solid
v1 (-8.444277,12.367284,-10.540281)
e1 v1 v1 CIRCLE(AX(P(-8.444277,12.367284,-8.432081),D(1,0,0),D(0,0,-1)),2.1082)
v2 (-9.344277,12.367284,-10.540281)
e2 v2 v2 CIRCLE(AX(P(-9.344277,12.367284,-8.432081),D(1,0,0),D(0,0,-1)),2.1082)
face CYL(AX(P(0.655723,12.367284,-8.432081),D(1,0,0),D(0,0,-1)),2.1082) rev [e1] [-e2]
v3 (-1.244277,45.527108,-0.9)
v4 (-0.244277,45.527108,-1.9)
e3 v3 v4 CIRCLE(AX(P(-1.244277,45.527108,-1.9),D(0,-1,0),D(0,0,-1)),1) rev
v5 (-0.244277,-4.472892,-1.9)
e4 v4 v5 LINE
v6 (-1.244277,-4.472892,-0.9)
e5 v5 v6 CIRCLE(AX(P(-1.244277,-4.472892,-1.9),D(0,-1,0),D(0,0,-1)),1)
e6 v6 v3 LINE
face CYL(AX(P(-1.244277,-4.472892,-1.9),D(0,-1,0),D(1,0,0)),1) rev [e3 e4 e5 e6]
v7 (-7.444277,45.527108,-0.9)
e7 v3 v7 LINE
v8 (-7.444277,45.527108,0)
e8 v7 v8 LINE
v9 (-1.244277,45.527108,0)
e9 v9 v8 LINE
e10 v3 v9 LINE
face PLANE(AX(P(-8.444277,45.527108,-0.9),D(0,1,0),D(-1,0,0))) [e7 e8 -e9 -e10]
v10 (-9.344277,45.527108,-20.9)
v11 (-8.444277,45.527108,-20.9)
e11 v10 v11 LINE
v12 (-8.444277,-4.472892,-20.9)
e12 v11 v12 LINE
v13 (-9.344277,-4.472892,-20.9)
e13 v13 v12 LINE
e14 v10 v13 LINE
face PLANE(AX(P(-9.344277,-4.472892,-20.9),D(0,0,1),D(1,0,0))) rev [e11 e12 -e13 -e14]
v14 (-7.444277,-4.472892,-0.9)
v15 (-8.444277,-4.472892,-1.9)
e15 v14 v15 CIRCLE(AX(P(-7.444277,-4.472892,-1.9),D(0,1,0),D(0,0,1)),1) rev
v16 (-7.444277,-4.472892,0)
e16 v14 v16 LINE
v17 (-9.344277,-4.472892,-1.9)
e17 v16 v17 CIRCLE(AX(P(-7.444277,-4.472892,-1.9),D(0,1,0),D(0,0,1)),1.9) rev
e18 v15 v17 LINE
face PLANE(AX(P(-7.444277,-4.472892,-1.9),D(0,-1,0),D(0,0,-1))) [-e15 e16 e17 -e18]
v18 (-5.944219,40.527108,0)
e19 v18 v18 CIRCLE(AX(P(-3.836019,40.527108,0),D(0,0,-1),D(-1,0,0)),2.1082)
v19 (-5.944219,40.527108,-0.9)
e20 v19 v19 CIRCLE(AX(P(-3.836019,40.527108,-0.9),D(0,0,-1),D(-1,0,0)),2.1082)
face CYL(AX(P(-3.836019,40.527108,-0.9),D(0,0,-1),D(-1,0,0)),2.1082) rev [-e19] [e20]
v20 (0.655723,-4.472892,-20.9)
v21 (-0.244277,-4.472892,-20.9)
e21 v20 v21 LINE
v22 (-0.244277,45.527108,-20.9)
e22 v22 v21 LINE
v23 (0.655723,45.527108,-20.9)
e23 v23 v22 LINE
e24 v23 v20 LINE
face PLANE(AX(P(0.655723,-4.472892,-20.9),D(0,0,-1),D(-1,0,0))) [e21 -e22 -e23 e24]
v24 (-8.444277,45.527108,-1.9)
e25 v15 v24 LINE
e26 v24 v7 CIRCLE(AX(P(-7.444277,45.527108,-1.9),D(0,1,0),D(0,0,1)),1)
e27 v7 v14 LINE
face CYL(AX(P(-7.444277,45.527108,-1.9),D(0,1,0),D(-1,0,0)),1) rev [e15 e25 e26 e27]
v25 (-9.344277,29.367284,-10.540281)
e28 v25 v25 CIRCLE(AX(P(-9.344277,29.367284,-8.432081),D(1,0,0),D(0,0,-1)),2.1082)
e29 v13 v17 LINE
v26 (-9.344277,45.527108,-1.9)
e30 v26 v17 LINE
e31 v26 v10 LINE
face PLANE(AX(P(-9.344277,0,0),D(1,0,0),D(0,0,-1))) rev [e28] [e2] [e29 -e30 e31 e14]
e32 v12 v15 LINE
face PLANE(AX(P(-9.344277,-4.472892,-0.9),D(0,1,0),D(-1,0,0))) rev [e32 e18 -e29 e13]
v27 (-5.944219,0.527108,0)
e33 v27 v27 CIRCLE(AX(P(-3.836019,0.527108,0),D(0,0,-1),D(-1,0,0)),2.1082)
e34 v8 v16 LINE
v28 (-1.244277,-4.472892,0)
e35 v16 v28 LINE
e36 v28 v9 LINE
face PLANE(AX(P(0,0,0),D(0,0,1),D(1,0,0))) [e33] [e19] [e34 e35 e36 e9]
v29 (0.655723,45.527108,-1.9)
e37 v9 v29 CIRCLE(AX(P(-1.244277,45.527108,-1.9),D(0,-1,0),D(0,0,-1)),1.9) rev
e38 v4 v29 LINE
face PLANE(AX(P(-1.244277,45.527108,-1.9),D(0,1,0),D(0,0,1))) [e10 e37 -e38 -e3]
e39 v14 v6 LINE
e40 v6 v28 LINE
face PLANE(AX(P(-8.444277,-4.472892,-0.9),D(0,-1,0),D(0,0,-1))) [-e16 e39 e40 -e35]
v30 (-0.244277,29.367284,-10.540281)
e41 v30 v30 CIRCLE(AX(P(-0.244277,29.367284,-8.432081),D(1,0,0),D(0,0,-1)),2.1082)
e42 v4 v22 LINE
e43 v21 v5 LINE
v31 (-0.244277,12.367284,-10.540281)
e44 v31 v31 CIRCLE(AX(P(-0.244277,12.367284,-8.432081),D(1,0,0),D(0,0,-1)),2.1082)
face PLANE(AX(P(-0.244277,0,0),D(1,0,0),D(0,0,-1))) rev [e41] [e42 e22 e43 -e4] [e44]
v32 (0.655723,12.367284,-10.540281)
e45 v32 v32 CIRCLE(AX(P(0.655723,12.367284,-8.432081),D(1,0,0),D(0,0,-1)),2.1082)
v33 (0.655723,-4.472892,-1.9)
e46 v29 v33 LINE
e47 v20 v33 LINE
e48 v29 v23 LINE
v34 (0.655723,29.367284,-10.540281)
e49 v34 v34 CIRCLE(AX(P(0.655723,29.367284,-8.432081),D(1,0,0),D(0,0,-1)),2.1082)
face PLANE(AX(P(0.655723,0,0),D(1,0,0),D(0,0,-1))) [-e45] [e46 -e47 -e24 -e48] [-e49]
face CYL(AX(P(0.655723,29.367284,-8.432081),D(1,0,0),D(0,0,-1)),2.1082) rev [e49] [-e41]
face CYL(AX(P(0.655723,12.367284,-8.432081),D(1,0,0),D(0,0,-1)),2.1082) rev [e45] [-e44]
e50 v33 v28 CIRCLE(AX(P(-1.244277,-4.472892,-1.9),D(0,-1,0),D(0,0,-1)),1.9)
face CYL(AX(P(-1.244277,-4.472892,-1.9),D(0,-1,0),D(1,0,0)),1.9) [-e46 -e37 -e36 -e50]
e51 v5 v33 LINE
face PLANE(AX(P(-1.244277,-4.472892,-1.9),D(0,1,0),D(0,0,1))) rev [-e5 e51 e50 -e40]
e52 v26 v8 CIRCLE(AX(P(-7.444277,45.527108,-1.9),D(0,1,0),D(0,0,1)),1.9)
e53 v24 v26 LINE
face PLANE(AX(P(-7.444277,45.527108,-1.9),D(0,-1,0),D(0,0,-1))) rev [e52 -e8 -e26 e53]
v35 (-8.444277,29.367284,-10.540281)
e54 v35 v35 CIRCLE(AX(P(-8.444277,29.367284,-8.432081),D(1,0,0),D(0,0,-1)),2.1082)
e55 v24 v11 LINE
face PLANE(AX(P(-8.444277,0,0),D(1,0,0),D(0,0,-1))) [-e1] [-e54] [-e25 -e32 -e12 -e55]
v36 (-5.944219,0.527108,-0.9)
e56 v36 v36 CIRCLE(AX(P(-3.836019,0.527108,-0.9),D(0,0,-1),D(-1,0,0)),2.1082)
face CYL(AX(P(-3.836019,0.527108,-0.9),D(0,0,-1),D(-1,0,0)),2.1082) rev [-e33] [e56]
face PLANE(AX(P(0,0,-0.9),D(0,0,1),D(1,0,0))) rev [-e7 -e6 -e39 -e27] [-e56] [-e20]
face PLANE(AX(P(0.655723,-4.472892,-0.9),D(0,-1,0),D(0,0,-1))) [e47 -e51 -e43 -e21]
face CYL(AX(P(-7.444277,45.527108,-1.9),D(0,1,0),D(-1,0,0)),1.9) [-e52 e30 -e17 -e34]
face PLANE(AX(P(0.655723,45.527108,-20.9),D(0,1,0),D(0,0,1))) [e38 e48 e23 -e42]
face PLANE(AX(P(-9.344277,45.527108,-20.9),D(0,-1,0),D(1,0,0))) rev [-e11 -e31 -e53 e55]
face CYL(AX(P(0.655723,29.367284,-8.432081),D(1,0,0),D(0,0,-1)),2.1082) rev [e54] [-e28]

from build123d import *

# Parameters (mm, degrees)
SKETCH1_W                    = 8.2
SKETCH1_H                    = 50
BASE_FLANGE1_DEPTH           = 0.9
EDGE_FLANGE2_STRIP_W         = 5.6
EDGE_FLANGE2_STRIP_H         = 0.9
EDGE_FLANGE2_STRIP_CUT_DEPTH = 50
EDGE_FLANGE2_DEPTH           = 50
EDGE_FLANGE5_STRIP_W         = 5.6
EDGE_FLANGE5_STRIP_H         = 0.9
EDGE_FLANGE5_STRIP_CUT_DEPTH = 50
EDGE_FLANGE5_DEPTH           = 50
F_19_0_166_DIAMETER_SLOT1_D  = 4.2164
F_19_0_166_DIAMETER_SLOT2_D  = 4.2164


# Sheet-metal steps are written as plain solids
with BuildPart() as part:
    # Sketch1 → Base-Flange1 (new body)
    with BuildSketch(Plane.XY):
        with Locations((-4.344277108, 20.527108434)):
            Rectangle(SKETCH1_W, SKETCH1_H)
    extrude(amount=-BASE_FLANGE1_DEPTH)

    # Edge-Flange2 strip (across the edge) → Edge-Flange2 strip cut (cut)
    with BuildSketch(Plane(origin=(-8.444277108, -4.472891566, -0.9), x_dir=(1, 0, 0), z_dir=(0, 1, 0))):
        with Locations((-1.8, -0.45)):
            Rectangle(EDGE_FLANGE2_STRIP_W, EDGE_FLANGE2_STRIP_H)
    extrude(amount=EDGE_FLANGE2_STRIP_CUT_DEPTH, mode=Mode.SUBTRACT)

    # Edge-Flange2 section (across the edge) → Edge-Flange2 (add)
    with BuildSketch(Plane(origin=(-8.444277108, -4.472891566, -0.9), x_dir=(1, 0, 0), z_dir=(0, 1, 0))):
        with BuildLine():
            Line((-0.9, 1), (-0.9, 20))
            Line((-0.9, 20), (0, 20))
            Line((0, 20), (0, 1))
            ThreePointArc((0, 1), (0.292893219, 0.292893219), (1, 0))
            Line((1, 0), (1, -0.9))
            ThreePointArc((1, -0.9), (-0.343502884, -0.343502884), (-0.9, 1))
        make_face()
    extrude(amount=EDGE_FLANGE2_DEPTH)

    # Edge-Flange5 strip (across the edge) → Edge-Flange5 strip cut (cut)
    with BuildSketch(Plane(origin=(-0.244277108, 45.527108434, -0.9), x_dir=(-1, 0, 0), z_dir=(0, -1, 0))):
        with Locations((-1.8, -0.45)):
            Rectangle(EDGE_FLANGE5_STRIP_W, EDGE_FLANGE5_STRIP_H)
    extrude(amount=EDGE_FLANGE5_STRIP_CUT_DEPTH, mode=Mode.SUBTRACT)

    # Edge-Flange5 section (across the edge) → Edge-Flange5 (add)
    with BuildSketch(Plane(origin=(-0.244277108, 45.527108434, -0.9), x_dir=(-1, 0, 0), z_dir=(0, -1, 0))):
        with BuildLine():
            Line((-0.9, 1), (-0.9, 20))
            Line((-0.9, 20), (0, 20))
            Line((0, 20), (0, 1))
            ThreePointArc((0, 1), (0.292893219, 0.292893219), (1, 0))
            Line((1, 0), (1, -0.9))
            ThreePointArc((1, -0.9), (-0.343502884, -0.343502884), (-0.9, 1))
        make_face()
    extrude(amount=EDGE_FLANGE5_DEPTH)

    # #19 (0.166) Diameter Slot1 (through all)
    with Locations(Plane(origin=(0, 0, -0.9), x_dir=(-1, 0, 0), z_dir=(0, 0, -1))):
        with Locations((3.836019002, 40.527108434), (3.836019002, 0.527108434)):
            Hole(F_19_0_166_DIAMETER_SLOT1_D / 2)

    # #19 (0.166) Diameter Slot2 (through all)
    with Locations(Plane(origin=(0.655722892, 0, 0), x_dir=(0, 0, -1), z_dir=(1, 0, 0))):
        with Locations((8.432080696, 29.367284102), (8.432080696, 12.367284102)):
            Hole(F_19_0_166_DIAMETER_SLOT2_D / 2)


solid = part.part
